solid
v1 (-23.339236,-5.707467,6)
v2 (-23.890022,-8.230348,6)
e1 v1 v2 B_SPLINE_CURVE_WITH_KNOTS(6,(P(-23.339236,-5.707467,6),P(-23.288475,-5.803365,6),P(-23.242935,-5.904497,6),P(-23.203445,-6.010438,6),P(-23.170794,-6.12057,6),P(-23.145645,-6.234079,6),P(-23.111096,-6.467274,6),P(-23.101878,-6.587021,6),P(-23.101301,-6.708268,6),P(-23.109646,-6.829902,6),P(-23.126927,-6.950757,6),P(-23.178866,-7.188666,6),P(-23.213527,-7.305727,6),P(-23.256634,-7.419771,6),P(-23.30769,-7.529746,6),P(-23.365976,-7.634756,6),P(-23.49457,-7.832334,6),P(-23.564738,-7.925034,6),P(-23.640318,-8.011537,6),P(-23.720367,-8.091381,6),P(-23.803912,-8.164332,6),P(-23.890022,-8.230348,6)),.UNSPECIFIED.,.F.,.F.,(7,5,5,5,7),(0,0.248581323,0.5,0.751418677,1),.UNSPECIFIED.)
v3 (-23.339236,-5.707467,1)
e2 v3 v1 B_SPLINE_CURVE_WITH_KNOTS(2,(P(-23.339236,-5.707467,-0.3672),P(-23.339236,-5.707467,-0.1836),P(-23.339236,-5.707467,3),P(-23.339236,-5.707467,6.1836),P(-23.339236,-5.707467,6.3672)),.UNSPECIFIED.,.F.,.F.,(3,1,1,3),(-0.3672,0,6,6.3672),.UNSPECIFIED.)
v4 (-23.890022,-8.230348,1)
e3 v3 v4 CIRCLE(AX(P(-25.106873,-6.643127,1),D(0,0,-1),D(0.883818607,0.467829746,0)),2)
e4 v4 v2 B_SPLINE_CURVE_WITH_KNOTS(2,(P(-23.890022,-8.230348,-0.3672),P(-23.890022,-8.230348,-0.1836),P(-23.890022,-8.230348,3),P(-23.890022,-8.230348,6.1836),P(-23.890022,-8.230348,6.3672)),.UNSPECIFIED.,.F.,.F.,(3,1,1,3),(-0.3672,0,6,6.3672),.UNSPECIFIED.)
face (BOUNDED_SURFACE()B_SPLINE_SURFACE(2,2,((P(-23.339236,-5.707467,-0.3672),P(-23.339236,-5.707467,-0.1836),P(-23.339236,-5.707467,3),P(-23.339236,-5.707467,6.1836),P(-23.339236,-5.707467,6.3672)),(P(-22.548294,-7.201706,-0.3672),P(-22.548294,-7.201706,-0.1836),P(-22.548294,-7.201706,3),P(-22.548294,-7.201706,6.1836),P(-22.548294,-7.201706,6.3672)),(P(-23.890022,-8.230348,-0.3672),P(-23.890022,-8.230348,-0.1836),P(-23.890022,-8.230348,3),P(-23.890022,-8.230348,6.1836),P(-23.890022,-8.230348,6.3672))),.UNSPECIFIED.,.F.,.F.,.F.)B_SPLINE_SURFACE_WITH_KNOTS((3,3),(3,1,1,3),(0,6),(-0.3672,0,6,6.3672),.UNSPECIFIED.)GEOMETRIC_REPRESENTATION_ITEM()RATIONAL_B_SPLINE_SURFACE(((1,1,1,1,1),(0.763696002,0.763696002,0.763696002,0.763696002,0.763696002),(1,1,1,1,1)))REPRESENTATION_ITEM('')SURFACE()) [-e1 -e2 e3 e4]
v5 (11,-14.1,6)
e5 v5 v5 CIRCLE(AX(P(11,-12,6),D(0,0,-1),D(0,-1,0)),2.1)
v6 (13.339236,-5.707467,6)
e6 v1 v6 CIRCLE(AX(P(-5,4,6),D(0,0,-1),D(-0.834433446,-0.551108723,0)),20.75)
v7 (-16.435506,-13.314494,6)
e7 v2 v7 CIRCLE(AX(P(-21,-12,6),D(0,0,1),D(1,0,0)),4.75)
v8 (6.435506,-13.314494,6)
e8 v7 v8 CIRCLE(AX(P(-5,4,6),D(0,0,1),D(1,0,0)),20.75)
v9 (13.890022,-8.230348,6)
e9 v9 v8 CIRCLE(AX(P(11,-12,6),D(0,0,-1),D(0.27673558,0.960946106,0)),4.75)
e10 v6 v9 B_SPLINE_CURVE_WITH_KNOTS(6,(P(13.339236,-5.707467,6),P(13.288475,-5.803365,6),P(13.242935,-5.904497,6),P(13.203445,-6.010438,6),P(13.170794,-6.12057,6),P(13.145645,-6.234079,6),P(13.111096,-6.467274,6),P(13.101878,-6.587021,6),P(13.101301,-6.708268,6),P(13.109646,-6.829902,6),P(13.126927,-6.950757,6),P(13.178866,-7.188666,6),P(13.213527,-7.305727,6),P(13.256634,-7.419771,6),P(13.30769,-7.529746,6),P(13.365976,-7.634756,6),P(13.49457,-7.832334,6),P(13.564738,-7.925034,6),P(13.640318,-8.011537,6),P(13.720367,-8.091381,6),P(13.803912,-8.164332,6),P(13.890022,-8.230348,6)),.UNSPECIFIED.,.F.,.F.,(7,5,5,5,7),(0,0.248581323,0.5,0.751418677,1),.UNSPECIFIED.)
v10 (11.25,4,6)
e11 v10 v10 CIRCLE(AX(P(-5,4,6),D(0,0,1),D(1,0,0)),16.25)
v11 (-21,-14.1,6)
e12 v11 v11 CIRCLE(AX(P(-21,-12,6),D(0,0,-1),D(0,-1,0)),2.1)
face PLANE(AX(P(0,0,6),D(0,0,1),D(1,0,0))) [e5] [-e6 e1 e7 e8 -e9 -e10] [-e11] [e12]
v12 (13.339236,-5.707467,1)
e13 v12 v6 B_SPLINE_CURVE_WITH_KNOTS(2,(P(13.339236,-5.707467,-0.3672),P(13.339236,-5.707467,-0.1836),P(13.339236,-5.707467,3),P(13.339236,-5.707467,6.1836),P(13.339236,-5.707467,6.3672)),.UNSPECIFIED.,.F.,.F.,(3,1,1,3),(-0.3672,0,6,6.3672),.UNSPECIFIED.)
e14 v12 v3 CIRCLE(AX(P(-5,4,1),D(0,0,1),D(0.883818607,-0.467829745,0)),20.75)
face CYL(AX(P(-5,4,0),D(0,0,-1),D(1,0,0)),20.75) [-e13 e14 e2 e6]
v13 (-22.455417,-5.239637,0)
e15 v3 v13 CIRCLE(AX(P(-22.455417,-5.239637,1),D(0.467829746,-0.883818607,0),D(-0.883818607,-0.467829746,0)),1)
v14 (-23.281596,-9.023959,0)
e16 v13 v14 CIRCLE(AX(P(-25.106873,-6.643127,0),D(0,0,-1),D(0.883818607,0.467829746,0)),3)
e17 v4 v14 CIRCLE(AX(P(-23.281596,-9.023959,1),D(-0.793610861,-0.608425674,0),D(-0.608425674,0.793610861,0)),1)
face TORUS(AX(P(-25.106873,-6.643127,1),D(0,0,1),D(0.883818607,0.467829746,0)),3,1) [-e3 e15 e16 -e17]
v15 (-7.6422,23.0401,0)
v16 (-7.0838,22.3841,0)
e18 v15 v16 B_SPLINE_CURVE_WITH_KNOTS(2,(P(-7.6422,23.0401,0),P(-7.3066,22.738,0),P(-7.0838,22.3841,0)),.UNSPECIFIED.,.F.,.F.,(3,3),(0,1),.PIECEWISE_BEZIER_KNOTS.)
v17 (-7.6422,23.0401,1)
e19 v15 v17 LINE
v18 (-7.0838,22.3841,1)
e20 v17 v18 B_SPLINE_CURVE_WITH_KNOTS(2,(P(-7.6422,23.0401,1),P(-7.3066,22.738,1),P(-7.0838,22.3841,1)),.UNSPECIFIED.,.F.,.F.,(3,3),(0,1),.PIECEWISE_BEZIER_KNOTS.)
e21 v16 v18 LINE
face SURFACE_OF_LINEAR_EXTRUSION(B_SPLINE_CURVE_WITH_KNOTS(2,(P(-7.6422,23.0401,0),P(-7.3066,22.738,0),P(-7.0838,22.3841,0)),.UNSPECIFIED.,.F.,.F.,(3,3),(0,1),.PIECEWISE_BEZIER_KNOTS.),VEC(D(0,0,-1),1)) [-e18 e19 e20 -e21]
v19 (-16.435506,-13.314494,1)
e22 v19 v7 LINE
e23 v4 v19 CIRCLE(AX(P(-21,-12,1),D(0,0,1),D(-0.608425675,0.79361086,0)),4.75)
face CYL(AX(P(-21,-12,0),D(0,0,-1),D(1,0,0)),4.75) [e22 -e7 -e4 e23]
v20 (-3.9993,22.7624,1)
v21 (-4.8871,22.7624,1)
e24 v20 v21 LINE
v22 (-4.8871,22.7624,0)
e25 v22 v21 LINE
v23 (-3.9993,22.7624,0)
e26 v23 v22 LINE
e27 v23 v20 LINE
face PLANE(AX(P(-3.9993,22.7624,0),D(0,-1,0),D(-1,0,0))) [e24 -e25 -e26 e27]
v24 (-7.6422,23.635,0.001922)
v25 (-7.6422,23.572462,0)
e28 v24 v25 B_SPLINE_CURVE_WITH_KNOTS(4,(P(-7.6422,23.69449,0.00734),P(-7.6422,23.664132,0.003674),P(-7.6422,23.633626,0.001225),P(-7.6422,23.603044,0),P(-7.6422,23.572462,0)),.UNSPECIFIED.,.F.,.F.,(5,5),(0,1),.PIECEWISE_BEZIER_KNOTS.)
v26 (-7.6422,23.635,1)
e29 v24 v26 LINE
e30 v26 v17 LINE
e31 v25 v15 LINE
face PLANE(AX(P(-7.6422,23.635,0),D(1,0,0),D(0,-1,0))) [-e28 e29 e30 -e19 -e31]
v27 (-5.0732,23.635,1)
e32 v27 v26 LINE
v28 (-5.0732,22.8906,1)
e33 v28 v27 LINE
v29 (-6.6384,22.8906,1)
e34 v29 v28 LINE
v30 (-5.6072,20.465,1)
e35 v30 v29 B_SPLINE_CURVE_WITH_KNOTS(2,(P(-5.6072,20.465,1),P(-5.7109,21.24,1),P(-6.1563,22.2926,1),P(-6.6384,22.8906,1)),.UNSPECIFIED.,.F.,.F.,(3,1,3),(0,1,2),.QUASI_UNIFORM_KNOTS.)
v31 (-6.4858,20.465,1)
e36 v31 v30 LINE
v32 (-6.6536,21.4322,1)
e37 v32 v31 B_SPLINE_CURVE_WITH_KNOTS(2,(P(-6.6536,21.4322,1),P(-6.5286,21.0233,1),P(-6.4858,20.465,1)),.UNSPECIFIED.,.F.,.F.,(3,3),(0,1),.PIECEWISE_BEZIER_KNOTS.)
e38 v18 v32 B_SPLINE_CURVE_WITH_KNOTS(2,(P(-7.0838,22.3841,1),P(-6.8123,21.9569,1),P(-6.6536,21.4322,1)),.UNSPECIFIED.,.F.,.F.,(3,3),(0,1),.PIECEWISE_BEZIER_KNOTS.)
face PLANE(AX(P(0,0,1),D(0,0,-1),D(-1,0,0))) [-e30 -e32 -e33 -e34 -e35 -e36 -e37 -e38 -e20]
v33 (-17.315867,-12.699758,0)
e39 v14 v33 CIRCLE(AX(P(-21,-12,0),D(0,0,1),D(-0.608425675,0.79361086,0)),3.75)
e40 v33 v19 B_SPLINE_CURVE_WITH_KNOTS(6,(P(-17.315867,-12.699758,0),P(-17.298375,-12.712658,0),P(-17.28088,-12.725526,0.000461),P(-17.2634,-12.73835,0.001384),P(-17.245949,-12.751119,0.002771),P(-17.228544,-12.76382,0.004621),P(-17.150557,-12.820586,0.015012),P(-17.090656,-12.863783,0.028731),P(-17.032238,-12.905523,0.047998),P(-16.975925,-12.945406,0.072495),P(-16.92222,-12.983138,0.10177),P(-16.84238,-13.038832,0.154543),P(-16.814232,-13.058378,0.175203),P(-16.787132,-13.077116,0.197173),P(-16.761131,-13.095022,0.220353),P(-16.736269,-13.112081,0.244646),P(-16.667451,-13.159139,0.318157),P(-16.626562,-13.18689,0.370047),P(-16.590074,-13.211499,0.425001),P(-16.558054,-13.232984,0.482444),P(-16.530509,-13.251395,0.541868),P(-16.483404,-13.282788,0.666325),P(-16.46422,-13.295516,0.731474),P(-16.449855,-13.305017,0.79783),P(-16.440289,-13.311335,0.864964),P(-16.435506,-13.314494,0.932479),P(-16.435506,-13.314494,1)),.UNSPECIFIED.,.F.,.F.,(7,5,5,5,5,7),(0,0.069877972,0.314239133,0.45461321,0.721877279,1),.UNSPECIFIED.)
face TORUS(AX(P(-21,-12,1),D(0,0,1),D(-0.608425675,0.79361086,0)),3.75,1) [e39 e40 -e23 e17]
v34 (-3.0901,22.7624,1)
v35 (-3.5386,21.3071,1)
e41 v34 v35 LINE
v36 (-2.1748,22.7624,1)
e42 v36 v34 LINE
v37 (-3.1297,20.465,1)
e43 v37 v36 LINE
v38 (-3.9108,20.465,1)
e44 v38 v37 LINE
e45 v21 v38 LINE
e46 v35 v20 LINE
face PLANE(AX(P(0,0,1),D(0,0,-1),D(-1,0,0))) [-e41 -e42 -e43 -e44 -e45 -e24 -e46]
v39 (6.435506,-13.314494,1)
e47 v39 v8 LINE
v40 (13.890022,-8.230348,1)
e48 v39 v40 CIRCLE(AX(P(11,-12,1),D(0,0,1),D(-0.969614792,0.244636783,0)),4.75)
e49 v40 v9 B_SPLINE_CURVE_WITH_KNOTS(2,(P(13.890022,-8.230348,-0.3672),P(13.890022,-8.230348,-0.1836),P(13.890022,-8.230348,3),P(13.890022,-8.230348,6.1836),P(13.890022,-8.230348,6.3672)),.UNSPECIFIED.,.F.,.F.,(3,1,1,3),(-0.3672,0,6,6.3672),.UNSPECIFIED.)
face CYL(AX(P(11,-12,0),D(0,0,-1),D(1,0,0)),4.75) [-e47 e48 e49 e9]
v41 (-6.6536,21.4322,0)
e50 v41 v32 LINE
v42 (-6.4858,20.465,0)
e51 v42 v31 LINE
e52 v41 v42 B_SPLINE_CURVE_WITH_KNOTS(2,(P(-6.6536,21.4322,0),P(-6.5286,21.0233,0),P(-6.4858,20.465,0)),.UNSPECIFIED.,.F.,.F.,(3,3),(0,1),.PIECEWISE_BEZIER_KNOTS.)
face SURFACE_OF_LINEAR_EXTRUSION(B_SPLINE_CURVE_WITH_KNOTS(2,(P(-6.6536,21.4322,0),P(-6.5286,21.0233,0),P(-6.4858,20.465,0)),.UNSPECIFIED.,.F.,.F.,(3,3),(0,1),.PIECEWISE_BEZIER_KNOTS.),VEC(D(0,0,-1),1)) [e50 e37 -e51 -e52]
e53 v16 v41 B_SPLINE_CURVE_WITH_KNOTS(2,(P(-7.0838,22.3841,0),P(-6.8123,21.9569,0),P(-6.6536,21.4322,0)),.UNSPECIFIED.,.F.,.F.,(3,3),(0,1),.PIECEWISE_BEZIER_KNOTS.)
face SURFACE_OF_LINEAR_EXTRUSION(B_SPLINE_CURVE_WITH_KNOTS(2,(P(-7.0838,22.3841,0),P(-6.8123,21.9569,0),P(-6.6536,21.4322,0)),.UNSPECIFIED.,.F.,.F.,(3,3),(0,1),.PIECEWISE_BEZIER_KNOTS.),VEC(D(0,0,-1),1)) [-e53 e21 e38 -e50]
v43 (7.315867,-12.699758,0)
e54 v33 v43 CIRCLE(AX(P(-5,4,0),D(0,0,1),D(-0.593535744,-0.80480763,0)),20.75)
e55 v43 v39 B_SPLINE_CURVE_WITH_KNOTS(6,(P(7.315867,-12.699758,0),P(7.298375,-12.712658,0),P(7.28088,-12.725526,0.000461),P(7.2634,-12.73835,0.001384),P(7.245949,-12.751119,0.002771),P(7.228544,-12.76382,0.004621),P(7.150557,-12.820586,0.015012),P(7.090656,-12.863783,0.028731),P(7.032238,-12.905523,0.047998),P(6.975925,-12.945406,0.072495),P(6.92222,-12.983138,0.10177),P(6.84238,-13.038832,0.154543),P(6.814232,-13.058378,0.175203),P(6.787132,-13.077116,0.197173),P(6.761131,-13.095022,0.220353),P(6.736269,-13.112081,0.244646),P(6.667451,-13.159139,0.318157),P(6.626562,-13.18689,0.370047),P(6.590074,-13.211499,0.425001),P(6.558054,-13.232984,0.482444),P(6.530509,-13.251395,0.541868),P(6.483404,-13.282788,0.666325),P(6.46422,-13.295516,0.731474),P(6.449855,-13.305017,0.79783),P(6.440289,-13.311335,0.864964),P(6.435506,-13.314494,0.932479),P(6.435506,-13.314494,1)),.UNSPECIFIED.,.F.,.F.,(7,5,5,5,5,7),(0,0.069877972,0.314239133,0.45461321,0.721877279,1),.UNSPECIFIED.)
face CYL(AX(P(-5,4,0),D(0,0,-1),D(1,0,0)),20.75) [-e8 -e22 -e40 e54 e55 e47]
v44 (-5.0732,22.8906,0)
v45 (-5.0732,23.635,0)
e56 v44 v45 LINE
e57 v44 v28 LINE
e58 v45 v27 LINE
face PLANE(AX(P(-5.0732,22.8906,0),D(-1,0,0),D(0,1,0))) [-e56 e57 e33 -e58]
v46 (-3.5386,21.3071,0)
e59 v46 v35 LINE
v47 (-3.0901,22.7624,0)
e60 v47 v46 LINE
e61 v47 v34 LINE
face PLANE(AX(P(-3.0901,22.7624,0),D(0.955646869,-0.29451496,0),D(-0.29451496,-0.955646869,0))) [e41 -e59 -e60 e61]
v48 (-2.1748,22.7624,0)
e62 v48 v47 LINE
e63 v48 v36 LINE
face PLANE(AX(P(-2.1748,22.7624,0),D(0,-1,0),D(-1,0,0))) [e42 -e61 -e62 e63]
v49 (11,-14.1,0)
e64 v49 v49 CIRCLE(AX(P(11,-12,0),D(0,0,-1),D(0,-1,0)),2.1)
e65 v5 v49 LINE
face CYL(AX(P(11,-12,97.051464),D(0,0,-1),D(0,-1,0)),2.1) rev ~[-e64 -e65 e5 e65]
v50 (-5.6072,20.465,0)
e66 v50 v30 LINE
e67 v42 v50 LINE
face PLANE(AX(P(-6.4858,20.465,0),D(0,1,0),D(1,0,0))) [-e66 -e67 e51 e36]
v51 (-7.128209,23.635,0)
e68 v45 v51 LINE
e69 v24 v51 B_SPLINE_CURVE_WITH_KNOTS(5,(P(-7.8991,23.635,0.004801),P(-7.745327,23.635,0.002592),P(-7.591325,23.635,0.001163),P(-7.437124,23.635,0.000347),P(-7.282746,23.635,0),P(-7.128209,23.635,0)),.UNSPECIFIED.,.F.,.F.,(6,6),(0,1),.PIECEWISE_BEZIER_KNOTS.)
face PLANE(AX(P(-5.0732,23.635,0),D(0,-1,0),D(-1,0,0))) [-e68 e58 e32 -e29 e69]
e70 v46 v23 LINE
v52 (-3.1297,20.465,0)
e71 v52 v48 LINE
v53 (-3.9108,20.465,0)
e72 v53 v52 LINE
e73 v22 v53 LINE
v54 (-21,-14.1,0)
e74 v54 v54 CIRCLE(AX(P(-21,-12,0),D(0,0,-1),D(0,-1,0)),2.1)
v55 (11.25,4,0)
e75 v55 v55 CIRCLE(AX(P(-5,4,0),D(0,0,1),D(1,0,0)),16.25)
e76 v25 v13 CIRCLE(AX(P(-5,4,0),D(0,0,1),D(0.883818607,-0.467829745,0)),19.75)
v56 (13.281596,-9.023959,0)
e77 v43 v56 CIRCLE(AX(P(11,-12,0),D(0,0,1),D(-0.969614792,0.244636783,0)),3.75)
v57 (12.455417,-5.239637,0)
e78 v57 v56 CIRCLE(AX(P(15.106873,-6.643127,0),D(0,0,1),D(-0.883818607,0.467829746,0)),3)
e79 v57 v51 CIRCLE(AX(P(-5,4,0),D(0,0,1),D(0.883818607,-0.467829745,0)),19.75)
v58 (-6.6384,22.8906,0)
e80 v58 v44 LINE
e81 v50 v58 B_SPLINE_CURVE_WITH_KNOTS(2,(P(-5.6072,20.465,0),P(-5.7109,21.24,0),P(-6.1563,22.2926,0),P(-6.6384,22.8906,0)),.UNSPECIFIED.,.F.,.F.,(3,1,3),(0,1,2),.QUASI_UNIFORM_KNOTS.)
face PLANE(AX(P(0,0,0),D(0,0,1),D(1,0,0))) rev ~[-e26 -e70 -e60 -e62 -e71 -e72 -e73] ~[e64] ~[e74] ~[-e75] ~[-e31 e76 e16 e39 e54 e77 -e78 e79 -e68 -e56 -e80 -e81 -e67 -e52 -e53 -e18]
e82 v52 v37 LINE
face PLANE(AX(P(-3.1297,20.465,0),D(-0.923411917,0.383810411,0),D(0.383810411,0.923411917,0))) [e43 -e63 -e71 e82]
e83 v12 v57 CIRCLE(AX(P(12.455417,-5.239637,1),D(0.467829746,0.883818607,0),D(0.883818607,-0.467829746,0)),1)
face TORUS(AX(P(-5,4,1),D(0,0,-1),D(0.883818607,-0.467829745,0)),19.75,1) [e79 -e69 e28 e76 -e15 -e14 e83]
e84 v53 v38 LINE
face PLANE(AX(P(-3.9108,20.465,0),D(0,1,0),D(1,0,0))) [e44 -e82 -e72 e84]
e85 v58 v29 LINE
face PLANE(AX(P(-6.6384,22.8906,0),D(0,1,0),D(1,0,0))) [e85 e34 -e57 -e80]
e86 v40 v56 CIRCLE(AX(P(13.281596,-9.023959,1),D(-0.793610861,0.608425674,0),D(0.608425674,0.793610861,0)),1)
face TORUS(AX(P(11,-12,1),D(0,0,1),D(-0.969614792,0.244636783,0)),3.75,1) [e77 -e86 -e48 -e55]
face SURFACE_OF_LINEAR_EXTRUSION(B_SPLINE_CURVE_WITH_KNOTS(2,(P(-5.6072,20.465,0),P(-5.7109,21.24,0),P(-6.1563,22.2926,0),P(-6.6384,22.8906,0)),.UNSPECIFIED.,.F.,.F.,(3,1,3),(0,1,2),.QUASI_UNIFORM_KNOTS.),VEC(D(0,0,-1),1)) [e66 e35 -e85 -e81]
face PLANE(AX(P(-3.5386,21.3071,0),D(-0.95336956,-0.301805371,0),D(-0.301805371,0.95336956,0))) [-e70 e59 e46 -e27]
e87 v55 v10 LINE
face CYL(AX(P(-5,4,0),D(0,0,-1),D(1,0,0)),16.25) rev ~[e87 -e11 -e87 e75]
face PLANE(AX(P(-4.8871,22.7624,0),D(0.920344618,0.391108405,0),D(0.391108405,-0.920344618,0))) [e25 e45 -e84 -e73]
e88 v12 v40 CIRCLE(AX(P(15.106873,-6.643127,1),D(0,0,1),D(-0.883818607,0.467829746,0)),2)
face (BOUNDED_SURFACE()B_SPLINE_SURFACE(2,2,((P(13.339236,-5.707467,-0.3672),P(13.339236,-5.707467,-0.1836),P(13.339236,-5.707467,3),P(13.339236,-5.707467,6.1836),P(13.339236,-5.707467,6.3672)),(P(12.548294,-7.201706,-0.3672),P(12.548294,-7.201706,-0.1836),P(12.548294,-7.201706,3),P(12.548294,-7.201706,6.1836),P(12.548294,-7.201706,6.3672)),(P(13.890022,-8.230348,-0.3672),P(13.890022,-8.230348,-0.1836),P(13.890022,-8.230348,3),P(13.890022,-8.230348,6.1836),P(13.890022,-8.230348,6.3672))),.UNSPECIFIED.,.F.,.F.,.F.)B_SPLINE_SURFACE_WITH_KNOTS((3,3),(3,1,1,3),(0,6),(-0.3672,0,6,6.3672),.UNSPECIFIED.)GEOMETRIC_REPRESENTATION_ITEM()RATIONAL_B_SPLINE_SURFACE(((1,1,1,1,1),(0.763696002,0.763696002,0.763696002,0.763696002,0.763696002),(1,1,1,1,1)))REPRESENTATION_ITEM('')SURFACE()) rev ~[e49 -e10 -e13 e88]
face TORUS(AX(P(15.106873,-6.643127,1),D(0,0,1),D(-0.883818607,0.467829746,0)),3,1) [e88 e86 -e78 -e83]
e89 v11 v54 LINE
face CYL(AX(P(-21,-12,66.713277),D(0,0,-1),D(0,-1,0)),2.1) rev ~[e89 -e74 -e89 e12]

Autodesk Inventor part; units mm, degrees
ref_plane "YZ Plane" through (0, 0, 0) normal (1, 0, 0) x (0, 1, 0)
ref_plane "XZ Plane" through (0, 0, 0) normal (0, 1, 0) x (-1, 0, 0)
sketch "Sketch1: base" plane through (0, 0, 0) normal (0, 0, 1) x (1, 0, 0)
  circle A0 centre (-5, 4) radius 16.25
  circle A1 centre (-5, 4) radius 20.75
  circle A2 centre (-21, -12) radius 4.75
  circle A3 centre (11, -12) radius 4.75
  line L0 (-21, -12) -> (11, -12) construction
  line L1 (-21, 20) -> (-21, -12) construction
  point P0 (0, 0)
  point P1 (-5, -12)
  point P2 (-21, 4)
  point P3 (-22.3145, -7.4355)
  point P4 (-16.4355, -13.3145)
  point P5 (6.4355, -13.3145)
  point P6 (12.3145, -7.4355)
  dimension "d0" = 9.5
  dimension "d1" = 32
  dimension "d2" = 41.5
  dimension "d3" = 32.5
  dimension "d4" = 32
sketch "Sketch2: tube stopper" plane through (0, 0, 0) normal (0, 0, 1) x (1, 0, 0)
  circle A0 centre (-5, 4) radius 14.875
  circle A1 centre (-5, 4) radius 16.25 projected
  point P0 (0, 0)
  dimension "d14" = 29.75
extrude "Ex1: base" add sketch "Sketch1: base" along normal blind 6
ref_plane "Work Plane1" through (0, 0, 0) normal (0, 0, 1) x (1, 0, 0)
sketch "Sketch: text" plane through (0, 0, 0) normal (0, 0, -1) x (-1, 0, 0)
  line L0 (3.25, 23.8) -> (6.75, 23.8) construction
  line L1 (6.75, 23.8) -> (6.75, 20.3) construction
  line L2 (6.75, 20.3) -> (3.25, 20.3) construction
  line L3 (3.25, 20.3) -> (3.25, 23.8) construction
  line L4 (2.1748, 22.7624) -> (3.0901, 22.7624)
  line L5 (3.0901, 22.7624) -> (3.5386, 21.3071)
  line L6 (3.5386, 21.3071) -> (3.9993, 22.7624)
  line L7 (3.9993, 22.7624) -> (4.8871, 22.7624)
  line L8 (4.8871, 22.7624) -> (3.9108, 20.465)
  line L9 (3.9108, 20.465) -> (3.1297, 20.465)
  line L10 (3.1297, 20.465) -> (2.1748, 22.7624)
  line L11 (5.0732, 23.635) -> (7.6422, 23.635)
  line L12 (7.6422, 23.635) -> (7.6422, 23.0401)
  spline S0 degree 2 poles (7.6422, 23.0401) (7.3066, 22.738) (7.0838, 22.3841) knots 0 0 0 1 1 1
  spline S1 degree 2 poles (7.0838, 22.3841) (6.8123, 21.9569) (6.6536, 21.4322) knots 0 0 0 1 1 1
  spline S2 degree 2 poles (6.6536, 21.4322) (6.5286, 21.0233) (6.4858, 20.465) knots 0 0 0 1 1 1
  line L13 (6.4858, 20.465) -> (5.6072, 20.465)
  spline S3 degree 2 poles (5.6072, 20.465) (5.7109, 21.24) (6.1563, 22.2926) (6.6384, 22.8906) knots 0 0 0 1 2 2 2
  line L14 (6.6384, 22.8906) -> (5.0732, 22.8906)
  line L15 (5.0732, 22.8906) -> (5.0732, 23.635)
  point P0 (0, 0)
  point P1 (5, 4)
  point P2 (5, 20.3)
  dimension "d22" = 3.5
  dimension "d23" = 16.3
hole "Hole1: M3 heat-sets" at (11, -12, 0) at (-21, -12, 0) direction (0, 0, -1) diameter 4.2 end through all both
extrude "Ex: tube stopper" [suppressed]
fillet "Fillet1" radius 2 2 edges at (12.3145, -7.4355, 3) (-22.3145, -7.4355, 3)
fillet "Fillet2" radius 1 5 edges at (-23.1529, -7.0697, 0) (-23.6764, -15.9242, 0) (13.1529, -7.0697, 0) (13.6764, -15.9242, 0) (-5, 24.75, 0)
extrude "Ex: text" cut sketch "Sketch: text" against normal blind 1 from surface at 0
properties part number "cage_inside_07"
